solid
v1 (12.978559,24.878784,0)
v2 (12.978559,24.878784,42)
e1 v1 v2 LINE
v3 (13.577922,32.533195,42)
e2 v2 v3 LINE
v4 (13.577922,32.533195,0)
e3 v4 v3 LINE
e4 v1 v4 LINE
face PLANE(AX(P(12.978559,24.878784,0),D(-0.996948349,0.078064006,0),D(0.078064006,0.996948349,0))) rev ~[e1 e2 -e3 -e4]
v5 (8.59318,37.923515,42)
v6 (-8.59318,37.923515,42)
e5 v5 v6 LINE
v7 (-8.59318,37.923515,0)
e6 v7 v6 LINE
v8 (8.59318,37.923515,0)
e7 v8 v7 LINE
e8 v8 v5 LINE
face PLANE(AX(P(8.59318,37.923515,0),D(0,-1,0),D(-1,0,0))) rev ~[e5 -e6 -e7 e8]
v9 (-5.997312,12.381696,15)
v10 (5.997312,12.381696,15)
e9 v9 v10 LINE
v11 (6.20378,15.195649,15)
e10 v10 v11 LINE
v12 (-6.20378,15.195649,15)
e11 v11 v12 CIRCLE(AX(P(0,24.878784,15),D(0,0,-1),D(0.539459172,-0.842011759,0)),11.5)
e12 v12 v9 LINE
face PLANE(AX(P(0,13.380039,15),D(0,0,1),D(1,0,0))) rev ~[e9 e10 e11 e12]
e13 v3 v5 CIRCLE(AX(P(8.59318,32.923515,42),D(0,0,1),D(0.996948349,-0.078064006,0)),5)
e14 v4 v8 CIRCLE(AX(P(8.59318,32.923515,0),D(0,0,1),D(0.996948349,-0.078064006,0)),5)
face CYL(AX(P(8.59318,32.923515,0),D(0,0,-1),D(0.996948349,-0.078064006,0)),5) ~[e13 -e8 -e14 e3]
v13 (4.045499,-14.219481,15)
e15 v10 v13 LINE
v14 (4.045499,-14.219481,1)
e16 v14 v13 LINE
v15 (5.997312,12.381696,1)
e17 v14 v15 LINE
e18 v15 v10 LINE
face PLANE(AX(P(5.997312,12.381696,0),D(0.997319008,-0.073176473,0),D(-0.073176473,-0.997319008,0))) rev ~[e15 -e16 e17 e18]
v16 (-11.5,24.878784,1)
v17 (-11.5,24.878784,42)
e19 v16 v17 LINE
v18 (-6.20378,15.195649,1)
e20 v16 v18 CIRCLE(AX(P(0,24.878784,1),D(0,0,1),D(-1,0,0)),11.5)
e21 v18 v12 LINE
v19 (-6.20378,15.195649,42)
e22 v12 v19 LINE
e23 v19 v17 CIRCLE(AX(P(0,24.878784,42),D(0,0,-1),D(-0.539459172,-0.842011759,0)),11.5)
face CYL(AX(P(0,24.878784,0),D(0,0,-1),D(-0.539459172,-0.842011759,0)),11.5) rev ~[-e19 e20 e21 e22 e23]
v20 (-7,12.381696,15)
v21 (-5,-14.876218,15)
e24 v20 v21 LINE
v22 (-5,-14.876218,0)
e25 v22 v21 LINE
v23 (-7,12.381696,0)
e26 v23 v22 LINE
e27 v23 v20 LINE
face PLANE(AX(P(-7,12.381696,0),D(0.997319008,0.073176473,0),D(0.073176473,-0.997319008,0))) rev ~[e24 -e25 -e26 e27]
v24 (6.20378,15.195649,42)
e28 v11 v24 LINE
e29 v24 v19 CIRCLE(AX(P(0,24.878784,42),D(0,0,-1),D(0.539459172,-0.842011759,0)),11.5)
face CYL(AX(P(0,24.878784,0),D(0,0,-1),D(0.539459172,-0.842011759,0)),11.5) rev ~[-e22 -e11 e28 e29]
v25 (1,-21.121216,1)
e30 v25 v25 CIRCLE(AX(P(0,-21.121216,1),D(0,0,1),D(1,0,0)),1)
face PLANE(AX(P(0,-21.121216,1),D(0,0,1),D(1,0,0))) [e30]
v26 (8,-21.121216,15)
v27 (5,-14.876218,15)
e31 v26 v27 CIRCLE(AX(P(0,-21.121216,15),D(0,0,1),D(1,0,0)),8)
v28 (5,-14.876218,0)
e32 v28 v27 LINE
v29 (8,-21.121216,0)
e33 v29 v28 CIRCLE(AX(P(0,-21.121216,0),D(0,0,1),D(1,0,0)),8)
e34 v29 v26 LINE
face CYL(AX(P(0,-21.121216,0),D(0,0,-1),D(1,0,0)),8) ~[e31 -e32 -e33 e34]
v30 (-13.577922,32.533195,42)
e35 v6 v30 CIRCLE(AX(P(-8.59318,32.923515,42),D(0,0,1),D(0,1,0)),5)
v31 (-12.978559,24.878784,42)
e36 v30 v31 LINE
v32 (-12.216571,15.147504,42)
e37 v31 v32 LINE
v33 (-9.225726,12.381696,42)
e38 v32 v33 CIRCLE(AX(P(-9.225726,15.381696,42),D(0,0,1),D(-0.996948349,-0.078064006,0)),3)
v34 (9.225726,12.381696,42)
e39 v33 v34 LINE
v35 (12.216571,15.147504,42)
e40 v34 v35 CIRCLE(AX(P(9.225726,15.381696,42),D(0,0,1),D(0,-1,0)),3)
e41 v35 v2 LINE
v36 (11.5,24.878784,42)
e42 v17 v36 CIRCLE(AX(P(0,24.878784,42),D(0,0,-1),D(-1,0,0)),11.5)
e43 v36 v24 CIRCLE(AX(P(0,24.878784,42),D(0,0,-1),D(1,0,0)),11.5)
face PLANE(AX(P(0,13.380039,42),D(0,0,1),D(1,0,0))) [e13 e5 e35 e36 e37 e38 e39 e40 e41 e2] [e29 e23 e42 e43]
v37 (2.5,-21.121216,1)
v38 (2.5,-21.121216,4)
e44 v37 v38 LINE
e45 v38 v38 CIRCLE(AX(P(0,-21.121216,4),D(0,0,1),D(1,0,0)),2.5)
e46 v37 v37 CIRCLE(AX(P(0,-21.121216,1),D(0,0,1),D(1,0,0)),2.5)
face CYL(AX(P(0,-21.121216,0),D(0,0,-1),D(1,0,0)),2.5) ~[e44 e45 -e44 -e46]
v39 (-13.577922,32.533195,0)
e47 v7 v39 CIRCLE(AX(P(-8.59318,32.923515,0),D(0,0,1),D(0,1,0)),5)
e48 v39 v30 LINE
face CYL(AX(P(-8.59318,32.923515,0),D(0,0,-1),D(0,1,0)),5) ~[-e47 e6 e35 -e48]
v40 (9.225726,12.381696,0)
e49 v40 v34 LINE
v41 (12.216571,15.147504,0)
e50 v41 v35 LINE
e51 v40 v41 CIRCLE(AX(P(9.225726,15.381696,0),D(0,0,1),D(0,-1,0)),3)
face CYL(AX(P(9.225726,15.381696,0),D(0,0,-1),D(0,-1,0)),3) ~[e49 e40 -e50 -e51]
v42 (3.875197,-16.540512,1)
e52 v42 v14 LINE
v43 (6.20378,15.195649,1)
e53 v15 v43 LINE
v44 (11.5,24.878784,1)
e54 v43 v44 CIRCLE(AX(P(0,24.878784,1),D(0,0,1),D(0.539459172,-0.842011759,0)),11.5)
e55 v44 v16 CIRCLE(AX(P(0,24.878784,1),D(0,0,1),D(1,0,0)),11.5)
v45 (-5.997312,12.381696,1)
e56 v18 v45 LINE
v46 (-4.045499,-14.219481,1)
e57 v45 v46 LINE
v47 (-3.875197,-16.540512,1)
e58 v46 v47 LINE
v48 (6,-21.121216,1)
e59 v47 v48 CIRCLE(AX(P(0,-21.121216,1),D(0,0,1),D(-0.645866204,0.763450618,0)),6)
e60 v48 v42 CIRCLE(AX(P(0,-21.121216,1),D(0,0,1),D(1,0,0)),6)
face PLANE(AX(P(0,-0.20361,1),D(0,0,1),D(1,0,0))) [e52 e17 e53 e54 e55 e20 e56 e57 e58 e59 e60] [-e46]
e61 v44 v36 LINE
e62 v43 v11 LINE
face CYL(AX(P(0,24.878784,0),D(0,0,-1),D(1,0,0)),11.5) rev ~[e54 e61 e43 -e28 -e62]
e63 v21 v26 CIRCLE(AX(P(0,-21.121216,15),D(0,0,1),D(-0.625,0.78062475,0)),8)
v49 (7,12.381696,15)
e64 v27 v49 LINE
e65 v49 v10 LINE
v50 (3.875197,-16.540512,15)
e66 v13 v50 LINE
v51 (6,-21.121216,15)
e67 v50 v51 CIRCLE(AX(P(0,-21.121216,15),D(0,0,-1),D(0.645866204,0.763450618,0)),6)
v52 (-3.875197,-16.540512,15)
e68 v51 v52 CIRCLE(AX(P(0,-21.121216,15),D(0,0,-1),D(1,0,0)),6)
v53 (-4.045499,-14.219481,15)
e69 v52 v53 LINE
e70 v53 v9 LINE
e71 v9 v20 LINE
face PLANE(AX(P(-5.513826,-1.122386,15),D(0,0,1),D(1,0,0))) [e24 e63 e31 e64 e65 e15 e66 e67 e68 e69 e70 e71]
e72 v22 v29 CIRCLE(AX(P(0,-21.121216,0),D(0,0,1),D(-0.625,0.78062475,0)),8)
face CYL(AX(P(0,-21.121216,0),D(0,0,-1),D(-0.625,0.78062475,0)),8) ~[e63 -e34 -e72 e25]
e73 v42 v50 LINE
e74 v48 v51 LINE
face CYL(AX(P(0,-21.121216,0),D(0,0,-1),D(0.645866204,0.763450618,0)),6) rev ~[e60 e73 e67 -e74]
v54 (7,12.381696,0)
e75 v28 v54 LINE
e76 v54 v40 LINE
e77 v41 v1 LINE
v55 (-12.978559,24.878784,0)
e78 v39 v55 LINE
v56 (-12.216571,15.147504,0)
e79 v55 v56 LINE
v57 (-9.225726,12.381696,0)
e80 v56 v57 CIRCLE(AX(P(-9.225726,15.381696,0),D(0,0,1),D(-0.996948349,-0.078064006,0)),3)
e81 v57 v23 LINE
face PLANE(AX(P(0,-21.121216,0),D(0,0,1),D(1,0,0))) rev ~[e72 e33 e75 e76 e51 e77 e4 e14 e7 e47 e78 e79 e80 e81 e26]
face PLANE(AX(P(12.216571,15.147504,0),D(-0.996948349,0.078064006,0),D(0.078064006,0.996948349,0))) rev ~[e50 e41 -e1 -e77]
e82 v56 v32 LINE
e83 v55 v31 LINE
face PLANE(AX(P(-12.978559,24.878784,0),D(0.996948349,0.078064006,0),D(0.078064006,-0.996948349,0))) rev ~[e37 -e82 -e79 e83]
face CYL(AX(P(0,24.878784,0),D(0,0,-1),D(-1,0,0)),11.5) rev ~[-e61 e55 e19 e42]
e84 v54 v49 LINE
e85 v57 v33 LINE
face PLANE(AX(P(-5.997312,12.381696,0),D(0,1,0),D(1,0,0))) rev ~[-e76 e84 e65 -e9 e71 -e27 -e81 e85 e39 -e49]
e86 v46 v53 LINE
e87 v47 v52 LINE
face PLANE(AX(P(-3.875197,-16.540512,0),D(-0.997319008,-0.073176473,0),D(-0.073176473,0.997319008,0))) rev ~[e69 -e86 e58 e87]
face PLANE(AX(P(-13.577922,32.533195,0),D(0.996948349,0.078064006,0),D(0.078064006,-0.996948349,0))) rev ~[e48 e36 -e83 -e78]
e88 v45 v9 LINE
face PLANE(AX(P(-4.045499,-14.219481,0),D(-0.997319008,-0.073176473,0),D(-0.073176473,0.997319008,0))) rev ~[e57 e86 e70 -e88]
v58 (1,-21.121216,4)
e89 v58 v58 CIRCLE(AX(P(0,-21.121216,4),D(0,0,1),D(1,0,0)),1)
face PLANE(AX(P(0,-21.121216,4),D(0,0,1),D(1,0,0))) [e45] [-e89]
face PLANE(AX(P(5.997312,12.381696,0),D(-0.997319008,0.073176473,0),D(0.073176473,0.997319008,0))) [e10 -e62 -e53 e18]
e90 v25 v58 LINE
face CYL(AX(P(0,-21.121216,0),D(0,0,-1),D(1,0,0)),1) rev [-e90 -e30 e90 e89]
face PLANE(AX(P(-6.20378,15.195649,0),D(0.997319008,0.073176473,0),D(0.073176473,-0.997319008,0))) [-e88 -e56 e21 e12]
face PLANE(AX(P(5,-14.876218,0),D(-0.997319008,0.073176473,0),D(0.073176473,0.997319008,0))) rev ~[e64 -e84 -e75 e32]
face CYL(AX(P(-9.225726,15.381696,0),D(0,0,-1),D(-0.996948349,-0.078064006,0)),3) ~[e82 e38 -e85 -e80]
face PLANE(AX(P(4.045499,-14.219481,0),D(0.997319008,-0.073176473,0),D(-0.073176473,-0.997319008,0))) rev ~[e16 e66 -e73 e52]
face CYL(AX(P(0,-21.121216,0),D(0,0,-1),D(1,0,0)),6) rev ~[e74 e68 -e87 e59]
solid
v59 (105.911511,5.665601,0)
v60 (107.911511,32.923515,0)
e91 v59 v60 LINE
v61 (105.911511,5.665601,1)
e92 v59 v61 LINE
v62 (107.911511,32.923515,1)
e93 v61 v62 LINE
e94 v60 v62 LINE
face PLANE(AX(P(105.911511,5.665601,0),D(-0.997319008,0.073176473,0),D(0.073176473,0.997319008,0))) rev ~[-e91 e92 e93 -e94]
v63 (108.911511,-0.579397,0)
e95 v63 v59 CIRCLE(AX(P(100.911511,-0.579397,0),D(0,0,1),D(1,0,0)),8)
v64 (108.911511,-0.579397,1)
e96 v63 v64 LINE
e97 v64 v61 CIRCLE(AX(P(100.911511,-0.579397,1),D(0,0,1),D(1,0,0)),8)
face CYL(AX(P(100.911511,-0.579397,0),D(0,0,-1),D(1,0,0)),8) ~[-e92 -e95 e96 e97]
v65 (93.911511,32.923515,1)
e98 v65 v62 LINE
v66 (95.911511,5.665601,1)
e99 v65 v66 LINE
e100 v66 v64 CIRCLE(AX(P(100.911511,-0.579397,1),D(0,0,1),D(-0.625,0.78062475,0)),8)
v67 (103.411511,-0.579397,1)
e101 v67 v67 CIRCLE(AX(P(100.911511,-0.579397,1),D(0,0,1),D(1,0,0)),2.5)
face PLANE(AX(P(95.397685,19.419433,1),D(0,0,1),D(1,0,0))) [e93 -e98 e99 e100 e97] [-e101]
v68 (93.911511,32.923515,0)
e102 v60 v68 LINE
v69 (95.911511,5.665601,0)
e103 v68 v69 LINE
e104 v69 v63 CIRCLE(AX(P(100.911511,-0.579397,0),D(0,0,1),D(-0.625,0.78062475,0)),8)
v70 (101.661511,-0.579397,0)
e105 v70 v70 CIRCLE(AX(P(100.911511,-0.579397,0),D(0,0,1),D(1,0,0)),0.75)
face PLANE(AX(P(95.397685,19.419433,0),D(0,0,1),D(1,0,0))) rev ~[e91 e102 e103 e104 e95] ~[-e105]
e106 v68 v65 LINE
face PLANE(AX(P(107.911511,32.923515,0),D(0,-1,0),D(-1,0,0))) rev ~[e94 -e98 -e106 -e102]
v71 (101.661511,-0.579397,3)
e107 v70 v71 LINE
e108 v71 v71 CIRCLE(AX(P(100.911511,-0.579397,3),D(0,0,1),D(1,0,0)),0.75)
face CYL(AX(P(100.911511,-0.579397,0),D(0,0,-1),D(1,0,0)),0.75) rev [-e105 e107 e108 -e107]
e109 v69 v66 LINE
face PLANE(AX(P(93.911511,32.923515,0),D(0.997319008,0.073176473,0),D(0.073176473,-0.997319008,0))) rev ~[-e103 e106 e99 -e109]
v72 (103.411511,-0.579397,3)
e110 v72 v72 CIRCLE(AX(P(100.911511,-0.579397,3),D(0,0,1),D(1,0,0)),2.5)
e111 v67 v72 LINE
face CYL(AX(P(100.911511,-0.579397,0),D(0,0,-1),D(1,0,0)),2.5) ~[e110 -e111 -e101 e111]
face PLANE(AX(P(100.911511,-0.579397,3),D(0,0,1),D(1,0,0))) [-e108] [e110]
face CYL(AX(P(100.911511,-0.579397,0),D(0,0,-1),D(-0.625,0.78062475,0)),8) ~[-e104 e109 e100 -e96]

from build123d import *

# Parameters (mm, degrees)
F1_DEPTH  = 42
F2_DEPTH  = 15
F3_DEPTH  = 42
F4_DEPTH  = 15
F5_DEPTH  = 1
F0_R      = 2.5
F6_DEPTH  = 1
F0_R_2    = 1
F7_DEPTH  = 4
F8_DEPTH  = 1
F9_DEPTH  = 1
F0_R_3    = 0.75
F10_DEPTH = 3


with BuildPart() as f1:
    # F0 (on Top) → F1 (new body)
    with BuildSketch(Plane.XY):
        with BuildLine():
            Line((-12.9785589716, 24.8787840627), (-11.5, 24.8787840627))
            ThreePointArc((-11.5, 24.8787840627), (0, 36.3787840627), (11.5, 24.8787840627))
            Line((11.5, 24.8787840627), (12.9785589716, 24.8787840627))
            Line((12.9785589716, 24.8787840627), (13.5779219878, 32.533194811))
            ThreePointArc((13.5779219878, 32.533194811), (12.264120187, 36.318246043), (8.593180242, 37.923514843))
            Line((8.593180242, 37.923514843), (-8.593180242, 37.923514843))
            ThreePointArc((-8.593180242, 37.923514843), (-12.264120187, 36.318246043), (-13.5779219878, 32.533194811))
            Line((-13.5779219878, 32.533194811), (-12.9785589716, 24.8787840627))
        make_face()
        with BuildLine():
            ThreePointArc((11.5, 24.8787840627), (10.0894369384, 19.3603366119), (6.2037804754, 15.1956488363))
            Line((6.2037804754, 15.1956488363), (5.997311801, 12.3816961423))
            Line((5.997311801, 12.3816961423), (7, 12.3816961423))
            Line((7, 12.3816961423), (9.2257259033, 12.3816961423))
            ThreePointArc((9.2257259033, 12.3816961423), (11.2625646233, 13.1791321752), (12.2165709508, 15.1475041231))
            Line((12.2165709508, 15.1475041231), (12.9785589716, 24.8787840627))
            Line((12.9785589716, 24.8787840627), (11.5, 24.8787840627))
        make_face()
        with BuildLine():
            Line((-5.997311801, 12.3816961423), (-6.2037804754, 15.1956488363))
            ThreePointArc((-6.2037804754, 15.1956488363), (-10.0894369384, 19.3603366119), (-11.5, 24.8787840627))
            Line((-11.5, 24.8787840627), (-12.9785589716, 24.8787840627))
            Line((-12.9785589716, 24.8787840627), (-12.2165709508, 15.1475041231))
            ThreePointArc((-12.2165709508, 15.1475041231), (-11.2625646233, 13.1791321752), (-9.2257259033, 12.3816961423))
            Line((-9.2257259033, 12.3816961423), (-7, 12.3816961423))
            Line((-7, 12.3816961423), (-5.997311801, 12.3816961423))
        make_face()
    extrude(amount=F1_DEPTH)

    # F0 (on Top) → F2 (join)
    with BuildSketch(Plane.XY):
        with BuildLine():
            Line((-4.0454986584, -14.219481329), (-5.997311801, 12.3816961423))
            Line((-5.997311801, 12.3816961423), (-7, 12.3816961423))
            Line((-7, 12.3816961423), (-5, -14.8762179389))
            ThreePointArc((-5, -14.8762179389), (-4.5346540374, -14.5305473247), (-4.0454986584, -14.219481329))
        make_face()
        with BuildLine():
            Line((7, 12.3816961423), (5.997311801, 12.3816961423))
            Line((5.997311801, 12.3816961423), (4.0454986584, -14.219481329))
            ThreePointArc((4.0454986584, -14.219481329), (4.5346540374, -14.5305473247), (5, -14.8762179389))
            Line((5, -14.8762179389), (7, 12.3816961423))
        make_face()
        with BuildLine():
            Line((-3.8751972264, -16.5405122298), (-4.0454986584, -14.219481329))
            ThreePointArc((-4.0454986584, -14.219481329), (-4.5346540374, -14.5305473247), (-5, -14.8762179389))
            ThreePointArc((-5, -14.8762179389), (-3.4641016151, -28.3323184883), (8, -21.1212159373))
            ThreePointArc((8, -21.1212159373), (7.2111025509, -17.6571143222), (5, -14.8762179389))
            ThreePointArc((5, -14.8762179389), (4.5346540374, -14.5305473247), (4.0454986584, -14.219481329))
            Line((4.0454986584, -14.219481329), (3.8751972264, -16.5405122298))
            ThreePointArc((3.8751972264, -16.5405122298), (5.4429396175, -18.5964568754), (6, -21.1212159373))
            ThreePointArc((6, -21.1212159373), (-2.5247590619, -26.5641555548), (-3.8751972264, -16.5405122298))
        make_face()
    extrude(amount=F2_DEPTH)

    # F0 (on Top) → F3 (join)
    with BuildSketch(Plane.XY):
        with BuildLine():
            ThreePointArc((6.2037804754, 15.1956488363), (0, 13.3787840627), (-6.2037804754, 15.1956488363))
            Line((-6.2037804754, 15.1956488363), (-5.997311801, 12.3816961423))
            Line((-5.997311801, 12.3816961423), (5.997311801, 12.3816961423))
            Line((5.997311801, 12.3816961423), (6.2037804754, 15.1956488363))
        make_face()
    extrude(amount=F3_DEPTH)

    # F0 (on Top) → F4 (cut)
    with BuildSketch(Plane.XY):
        with BuildLine():
            ThreePointArc((6.2037804754, 15.1956488363), (0, 13.3787840627), (-6.2037804754, 15.1956488363))
            Line((-6.2037804754, 15.1956488363), (-5.997311801, 12.3816961423))
            Line((-5.997311801, 12.3816961423), (5.997311801, 12.3816961423))
            Line((5.997311801, 12.3816961423), (6.2037804754, 15.1956488363))
        make_face()
    extrude(amount=F4_DEPTH, mode=Mode.SUBTRACT)

    # F0 (on Top) → F5 (join)
    with BuildSketch(Plane.XY):
        with BuildLine():
            ThreePointArc((-11.5, 24.8787840627), (-10.0894369384, 19.3603366119), (-6.2037804754, 15.1956488363))
            ThreePointArc((-6.2037804754, 15.1956488363), (0, 13.3787840627), (6.2037804754, 15.1956488363))
            ThreePointArc((6.2037804754, 15.1956488363), (10.0894369384, 19.3603366119), (11.5, 24.8787840627))
            Line((11.5, 24.8787840627), (9.5, 24.8787840627))
            ThreePointArc((9.5, 24.8787840627), (0, 15.3787840627), (-9.5, 24.8787840627))
            Line((-9.5, 24.8787840627), (-11.5, 24.8787840627))
        make_face()
        with BuildLine():
            ThreePointArc((11.5, 24.8787840627), (0, 36.3787840627), (-11.5, 24.8787840627))
            Line((-11.5, 24.8787840627), (-9.5, 24.8787840627))
            ThreePointArc((-9.5, 24.8787840627), (0, 34.3787840627), (9.5, 24.8787840627))
            Line((9.5, 24.8787840627), (11.5, 24.8787840627))
        make_face()
        with BuildLine():
            Line((5.997311801, 12.3816961423), (-5.997311801, 12.3816961423))
            Line((-5.997311801, 12.3816961423), (-4.0454986584, -14.219481329))
            ThreePointArc((-4.0454986584, -14.219481329), (0, -13.1212159373), (4.0454986584, -14.219481329))
            Line((4.0454986584, -14.219481329), (5.997311801, 12.3816961423))
        make_face()
        with BuildLine():
            Line((0, 24.8787840627), (-9.5, 24.8787840627))
            ThreePointArc((-9.5, 24.8787840627), (0, 15.3787840627), (9.5, 24.8787840627))
            Line((9.5, 24.8787840627), (0, 24.8787840627))
        make_face()
        with BuildLine():
            ThreePointArc((9.5, 24.8787840627), (0, 34.3787840627), (-9.5, 24.8787840627))
            Line((-9.5, 24.8787840627), (0, 24.8787840627))
            Line((0, 24.8787840627), (9.5, 24.8787840627))
        make_face()
    extrude(amount=F5_DEPTH)

    # F0 (on Top) → F6 (join)
    with BuildSketch(Plane.XY):
        with BuildLine():
            Line((5.997311801, 12.3816961423), (-5.997311801, 12.3816961423))
            Line((-5.997311801, 12.3816961423), (-4.0454986584, -14.219481329))
            ThreePointArc((-4.0454986584, -14.219481329), (0, -13.1212159373), (4.0454986584, -14.219481329))
            Line((4.0454986584, -14.219481329), (5.997311801, 12.3816961423))
        make_face()
        with BuildLine():
            ThreePointArc((3.8751972264, -16.5405122298), (0, -15.1212159373), (-3.8751972264, -16.5405122298))
            ThreePointArc((-3.8751972264, -16.5405122298), (-2.5247590619, -26.5641555548), (6, -21.1212159373))
            ThreePointArc((6, -21.1212159373), (5.4429396175, -18.5964568754), (3.8751972264, -16.5405122298))
        make_face()
        with Locations((0, -21.1212159373)):
            Circle(F0_R, mode=Mode.SUBTRACT)
        with BuildLine():
            ThreePointArc((4.0454986584, -14.219481329), (0, -13.1212159373), (-4.0454986584, -14.219481329))
            Line((-4.0454986584, -14.219481329), (-3.8751972264, -16.5405122298))
            ThreePointArc((-3.8751972264, -16.5405122298), (0, -15.1212159373), (3.8751972264, -16.5405122298))
            Line((3.8751972264, -16.5405122298), (4.0454986584, -14.219481329))
        make_face()
        with BuildLine():
            ThreePointArc((6.2037804754, 15.1956488363), (0, 13.3787840627), (-6.2037804754, 15.1956488363))
            Line((-6.2037804754, 15.1956488363), (-5.997311801, 12.3816961423))
            Line((-5.997311801, 12.3816961423), (5.997311801, 12.3816961423))
            Line((5.997311801, 12.3816961423), (6.2037804754, 15.1956488363))
        make_face()
    extrude(amount=F6_DEPTH)

    # F0 (on Top) → F7 (join)
    with BuildSketch(Plane.XY):
        with Locations((0, -21.1212159373)):
            Circle(F0_R)
        with Locations((0, -21.1212159373)):
            Circle(F0_R_2, mode=Mode.SUBTRACT)
    extrude(amount=F7_DEPTH)

    # F0 (on Top) → F8 (join)
    with BuildSketch(Plane.XY):
        with Locations((0, -21.1212159373)):
            Circle(F0_R_2)
    extrude(amount=F8_DEPTH)


with BuildPart() as f5:
    # F0 (on Top) → F5, piece 2 (new body)
    with BuildSketch(Plane.XY):
        with BuildLine():
            Line((106.908822805, 32.923514843), (94.914199203, 32.923514843))
            Line((94.914199203, 32.923514843), (96.8660123455, 6.3223373718))
            ThreePointArc((96.8660123455, 6.3223373718), (100.911511004, 7.4206027634), (104.9570096624, 6.3223373718))
            Line((104.9570096624, 6.3223373718), (106.908822805, 32.923514843))
        make_face()
    extrude(amount=F5_DEPTH)

    # F0 (on Top) → F9 (join)
    with BuildSketch(Plane.XY):
        with BuildLine():
            Line((96.8660123455, 6.3223373718), (94.914199203, 32.923514843))
            Line((94.914199203, 32.923514843), (93.911511004, 32.923514843))
            Line((93.911511004, 32.923514843), (95.911511004, 5.6656007618))
            ThreePointArc((95.911511004, 5.6656007618), (96.3768569666, 6.011271376), (96.8660123455, 6.3223373718))
        make_face()
        with BuildLine():
            Line((107.911511004, 32.923514843), (106.908822805, 32.923514843))
            Line((106.908822805, 32.923514843), (104.9570096624, 6.3223373718))
            ThreePointArc((104.9570096624, 6.3223373718), (105.4461650413, 6.011271376), (105.911511004, 5.6656007618))
            Line((105.911511004, 5.6656007618), (107.911511004, 32.923514843))
        make_face()
        with BuildLine():
            Line((106.908822805, 32.923514843), (94.914199203, 32.923514843))
            Line((94.914199203, 32.923514843), (96.8660123455, 6.3223373718))
            ThreePointArc((96.8660123455, 6.3223373718), (100.911511004, 7.4206027634), (104.9570096624, 6.3223373718))
            Line((104.9570096624, 6.3223373718), (106.908822805, 32.923514843))
        make_face()
        with BuildLine():
            ThreePointArc((104.9570096624, 6.3223373718), (100.911511004, 7.4206027634), (96.8660123455, 6.3223373718))
            Line((96.8660123455, 6.3223373718), (97.0363137775, 4.0013064709))
            ThreePointArc((97.0363137775, 4.0013064709), (100.911511004, 5.4206027634), (104.7867082304, 4.0013064709))
            Line((104.7867082304, 4.0013064709), (104.9570096624, 6.3223373718))
        make_face()
        with BuildLine():
            Line((97.0363137775, 4.0013064709), (96.8660123455, 6.3223373718))
            ThreePointArc((96.8660123455, 6.3223373718), (96.3768569666, 6.011271376), (95.911511004, 5.6656007618))
            ThreePointArc((95.911511004, 5.6656007618), (97.4474093888, -7.7904997875), (108.911511004, -0.5793972366))
            ThreePointArc((108.911511004, -0.5793972366), (108.1226135549, 2.8847043785), (105.911511004, 5.6656007618))
            ThreePointArc((105.911511004, 5.6656007618), (105.4461650413, 6.011271376), (104.9570096624, 6.3223373718))
            Line((104.9570096624, 6.3223373718), (104.7867082304, 4.0013064709))
            ThreePointArc((104.7867082304, 4.0013064709), (106.3544506214, 1.9453618253), (106.911511004, -0.5793972366))
            ThreePointArc((106.911511004, -0.5793972366), (98.3867519421, -6.0223368541), (97.0363137775, 4.0013064709))
        make_face()
        with BuildLine():
            ThreePointArc((104.7867082304, 4.0013064709), (100.911511004, 5.4206027634), (97.0363137775, 4.0013064709))
            ThreePointArc((97.0363137775, 4.0013064709), (98.3867519421, -6.0223368541), (106.911511004, -0.5793972366))
            ThreePointArc((106.911511004, -0.5793972366), (106.3544506214, 1.9453618253), (104.7867082304, 4.0013064709))
        make_face()
        with Locations((100.911511004, -0.5793972366)):
            Circle(F0_R, mode=Mode.SUBTRACT)
    extrude(amount=F9_DEPTH)

    # F0 (on Top) → F10 (join)
    with BuildSketch(Plane.XY):
        with Locations((100.911511004, -0.5793972366)):
            Circle(F0_R)
        with Locations((100.911511004, -0.5793972366)):
            Circle(F0_R_3, mode=Mode.SUBTRACT)
    extrude(amount=F10_DEPTH)


solid = Compound([f1.part, f5.part])
